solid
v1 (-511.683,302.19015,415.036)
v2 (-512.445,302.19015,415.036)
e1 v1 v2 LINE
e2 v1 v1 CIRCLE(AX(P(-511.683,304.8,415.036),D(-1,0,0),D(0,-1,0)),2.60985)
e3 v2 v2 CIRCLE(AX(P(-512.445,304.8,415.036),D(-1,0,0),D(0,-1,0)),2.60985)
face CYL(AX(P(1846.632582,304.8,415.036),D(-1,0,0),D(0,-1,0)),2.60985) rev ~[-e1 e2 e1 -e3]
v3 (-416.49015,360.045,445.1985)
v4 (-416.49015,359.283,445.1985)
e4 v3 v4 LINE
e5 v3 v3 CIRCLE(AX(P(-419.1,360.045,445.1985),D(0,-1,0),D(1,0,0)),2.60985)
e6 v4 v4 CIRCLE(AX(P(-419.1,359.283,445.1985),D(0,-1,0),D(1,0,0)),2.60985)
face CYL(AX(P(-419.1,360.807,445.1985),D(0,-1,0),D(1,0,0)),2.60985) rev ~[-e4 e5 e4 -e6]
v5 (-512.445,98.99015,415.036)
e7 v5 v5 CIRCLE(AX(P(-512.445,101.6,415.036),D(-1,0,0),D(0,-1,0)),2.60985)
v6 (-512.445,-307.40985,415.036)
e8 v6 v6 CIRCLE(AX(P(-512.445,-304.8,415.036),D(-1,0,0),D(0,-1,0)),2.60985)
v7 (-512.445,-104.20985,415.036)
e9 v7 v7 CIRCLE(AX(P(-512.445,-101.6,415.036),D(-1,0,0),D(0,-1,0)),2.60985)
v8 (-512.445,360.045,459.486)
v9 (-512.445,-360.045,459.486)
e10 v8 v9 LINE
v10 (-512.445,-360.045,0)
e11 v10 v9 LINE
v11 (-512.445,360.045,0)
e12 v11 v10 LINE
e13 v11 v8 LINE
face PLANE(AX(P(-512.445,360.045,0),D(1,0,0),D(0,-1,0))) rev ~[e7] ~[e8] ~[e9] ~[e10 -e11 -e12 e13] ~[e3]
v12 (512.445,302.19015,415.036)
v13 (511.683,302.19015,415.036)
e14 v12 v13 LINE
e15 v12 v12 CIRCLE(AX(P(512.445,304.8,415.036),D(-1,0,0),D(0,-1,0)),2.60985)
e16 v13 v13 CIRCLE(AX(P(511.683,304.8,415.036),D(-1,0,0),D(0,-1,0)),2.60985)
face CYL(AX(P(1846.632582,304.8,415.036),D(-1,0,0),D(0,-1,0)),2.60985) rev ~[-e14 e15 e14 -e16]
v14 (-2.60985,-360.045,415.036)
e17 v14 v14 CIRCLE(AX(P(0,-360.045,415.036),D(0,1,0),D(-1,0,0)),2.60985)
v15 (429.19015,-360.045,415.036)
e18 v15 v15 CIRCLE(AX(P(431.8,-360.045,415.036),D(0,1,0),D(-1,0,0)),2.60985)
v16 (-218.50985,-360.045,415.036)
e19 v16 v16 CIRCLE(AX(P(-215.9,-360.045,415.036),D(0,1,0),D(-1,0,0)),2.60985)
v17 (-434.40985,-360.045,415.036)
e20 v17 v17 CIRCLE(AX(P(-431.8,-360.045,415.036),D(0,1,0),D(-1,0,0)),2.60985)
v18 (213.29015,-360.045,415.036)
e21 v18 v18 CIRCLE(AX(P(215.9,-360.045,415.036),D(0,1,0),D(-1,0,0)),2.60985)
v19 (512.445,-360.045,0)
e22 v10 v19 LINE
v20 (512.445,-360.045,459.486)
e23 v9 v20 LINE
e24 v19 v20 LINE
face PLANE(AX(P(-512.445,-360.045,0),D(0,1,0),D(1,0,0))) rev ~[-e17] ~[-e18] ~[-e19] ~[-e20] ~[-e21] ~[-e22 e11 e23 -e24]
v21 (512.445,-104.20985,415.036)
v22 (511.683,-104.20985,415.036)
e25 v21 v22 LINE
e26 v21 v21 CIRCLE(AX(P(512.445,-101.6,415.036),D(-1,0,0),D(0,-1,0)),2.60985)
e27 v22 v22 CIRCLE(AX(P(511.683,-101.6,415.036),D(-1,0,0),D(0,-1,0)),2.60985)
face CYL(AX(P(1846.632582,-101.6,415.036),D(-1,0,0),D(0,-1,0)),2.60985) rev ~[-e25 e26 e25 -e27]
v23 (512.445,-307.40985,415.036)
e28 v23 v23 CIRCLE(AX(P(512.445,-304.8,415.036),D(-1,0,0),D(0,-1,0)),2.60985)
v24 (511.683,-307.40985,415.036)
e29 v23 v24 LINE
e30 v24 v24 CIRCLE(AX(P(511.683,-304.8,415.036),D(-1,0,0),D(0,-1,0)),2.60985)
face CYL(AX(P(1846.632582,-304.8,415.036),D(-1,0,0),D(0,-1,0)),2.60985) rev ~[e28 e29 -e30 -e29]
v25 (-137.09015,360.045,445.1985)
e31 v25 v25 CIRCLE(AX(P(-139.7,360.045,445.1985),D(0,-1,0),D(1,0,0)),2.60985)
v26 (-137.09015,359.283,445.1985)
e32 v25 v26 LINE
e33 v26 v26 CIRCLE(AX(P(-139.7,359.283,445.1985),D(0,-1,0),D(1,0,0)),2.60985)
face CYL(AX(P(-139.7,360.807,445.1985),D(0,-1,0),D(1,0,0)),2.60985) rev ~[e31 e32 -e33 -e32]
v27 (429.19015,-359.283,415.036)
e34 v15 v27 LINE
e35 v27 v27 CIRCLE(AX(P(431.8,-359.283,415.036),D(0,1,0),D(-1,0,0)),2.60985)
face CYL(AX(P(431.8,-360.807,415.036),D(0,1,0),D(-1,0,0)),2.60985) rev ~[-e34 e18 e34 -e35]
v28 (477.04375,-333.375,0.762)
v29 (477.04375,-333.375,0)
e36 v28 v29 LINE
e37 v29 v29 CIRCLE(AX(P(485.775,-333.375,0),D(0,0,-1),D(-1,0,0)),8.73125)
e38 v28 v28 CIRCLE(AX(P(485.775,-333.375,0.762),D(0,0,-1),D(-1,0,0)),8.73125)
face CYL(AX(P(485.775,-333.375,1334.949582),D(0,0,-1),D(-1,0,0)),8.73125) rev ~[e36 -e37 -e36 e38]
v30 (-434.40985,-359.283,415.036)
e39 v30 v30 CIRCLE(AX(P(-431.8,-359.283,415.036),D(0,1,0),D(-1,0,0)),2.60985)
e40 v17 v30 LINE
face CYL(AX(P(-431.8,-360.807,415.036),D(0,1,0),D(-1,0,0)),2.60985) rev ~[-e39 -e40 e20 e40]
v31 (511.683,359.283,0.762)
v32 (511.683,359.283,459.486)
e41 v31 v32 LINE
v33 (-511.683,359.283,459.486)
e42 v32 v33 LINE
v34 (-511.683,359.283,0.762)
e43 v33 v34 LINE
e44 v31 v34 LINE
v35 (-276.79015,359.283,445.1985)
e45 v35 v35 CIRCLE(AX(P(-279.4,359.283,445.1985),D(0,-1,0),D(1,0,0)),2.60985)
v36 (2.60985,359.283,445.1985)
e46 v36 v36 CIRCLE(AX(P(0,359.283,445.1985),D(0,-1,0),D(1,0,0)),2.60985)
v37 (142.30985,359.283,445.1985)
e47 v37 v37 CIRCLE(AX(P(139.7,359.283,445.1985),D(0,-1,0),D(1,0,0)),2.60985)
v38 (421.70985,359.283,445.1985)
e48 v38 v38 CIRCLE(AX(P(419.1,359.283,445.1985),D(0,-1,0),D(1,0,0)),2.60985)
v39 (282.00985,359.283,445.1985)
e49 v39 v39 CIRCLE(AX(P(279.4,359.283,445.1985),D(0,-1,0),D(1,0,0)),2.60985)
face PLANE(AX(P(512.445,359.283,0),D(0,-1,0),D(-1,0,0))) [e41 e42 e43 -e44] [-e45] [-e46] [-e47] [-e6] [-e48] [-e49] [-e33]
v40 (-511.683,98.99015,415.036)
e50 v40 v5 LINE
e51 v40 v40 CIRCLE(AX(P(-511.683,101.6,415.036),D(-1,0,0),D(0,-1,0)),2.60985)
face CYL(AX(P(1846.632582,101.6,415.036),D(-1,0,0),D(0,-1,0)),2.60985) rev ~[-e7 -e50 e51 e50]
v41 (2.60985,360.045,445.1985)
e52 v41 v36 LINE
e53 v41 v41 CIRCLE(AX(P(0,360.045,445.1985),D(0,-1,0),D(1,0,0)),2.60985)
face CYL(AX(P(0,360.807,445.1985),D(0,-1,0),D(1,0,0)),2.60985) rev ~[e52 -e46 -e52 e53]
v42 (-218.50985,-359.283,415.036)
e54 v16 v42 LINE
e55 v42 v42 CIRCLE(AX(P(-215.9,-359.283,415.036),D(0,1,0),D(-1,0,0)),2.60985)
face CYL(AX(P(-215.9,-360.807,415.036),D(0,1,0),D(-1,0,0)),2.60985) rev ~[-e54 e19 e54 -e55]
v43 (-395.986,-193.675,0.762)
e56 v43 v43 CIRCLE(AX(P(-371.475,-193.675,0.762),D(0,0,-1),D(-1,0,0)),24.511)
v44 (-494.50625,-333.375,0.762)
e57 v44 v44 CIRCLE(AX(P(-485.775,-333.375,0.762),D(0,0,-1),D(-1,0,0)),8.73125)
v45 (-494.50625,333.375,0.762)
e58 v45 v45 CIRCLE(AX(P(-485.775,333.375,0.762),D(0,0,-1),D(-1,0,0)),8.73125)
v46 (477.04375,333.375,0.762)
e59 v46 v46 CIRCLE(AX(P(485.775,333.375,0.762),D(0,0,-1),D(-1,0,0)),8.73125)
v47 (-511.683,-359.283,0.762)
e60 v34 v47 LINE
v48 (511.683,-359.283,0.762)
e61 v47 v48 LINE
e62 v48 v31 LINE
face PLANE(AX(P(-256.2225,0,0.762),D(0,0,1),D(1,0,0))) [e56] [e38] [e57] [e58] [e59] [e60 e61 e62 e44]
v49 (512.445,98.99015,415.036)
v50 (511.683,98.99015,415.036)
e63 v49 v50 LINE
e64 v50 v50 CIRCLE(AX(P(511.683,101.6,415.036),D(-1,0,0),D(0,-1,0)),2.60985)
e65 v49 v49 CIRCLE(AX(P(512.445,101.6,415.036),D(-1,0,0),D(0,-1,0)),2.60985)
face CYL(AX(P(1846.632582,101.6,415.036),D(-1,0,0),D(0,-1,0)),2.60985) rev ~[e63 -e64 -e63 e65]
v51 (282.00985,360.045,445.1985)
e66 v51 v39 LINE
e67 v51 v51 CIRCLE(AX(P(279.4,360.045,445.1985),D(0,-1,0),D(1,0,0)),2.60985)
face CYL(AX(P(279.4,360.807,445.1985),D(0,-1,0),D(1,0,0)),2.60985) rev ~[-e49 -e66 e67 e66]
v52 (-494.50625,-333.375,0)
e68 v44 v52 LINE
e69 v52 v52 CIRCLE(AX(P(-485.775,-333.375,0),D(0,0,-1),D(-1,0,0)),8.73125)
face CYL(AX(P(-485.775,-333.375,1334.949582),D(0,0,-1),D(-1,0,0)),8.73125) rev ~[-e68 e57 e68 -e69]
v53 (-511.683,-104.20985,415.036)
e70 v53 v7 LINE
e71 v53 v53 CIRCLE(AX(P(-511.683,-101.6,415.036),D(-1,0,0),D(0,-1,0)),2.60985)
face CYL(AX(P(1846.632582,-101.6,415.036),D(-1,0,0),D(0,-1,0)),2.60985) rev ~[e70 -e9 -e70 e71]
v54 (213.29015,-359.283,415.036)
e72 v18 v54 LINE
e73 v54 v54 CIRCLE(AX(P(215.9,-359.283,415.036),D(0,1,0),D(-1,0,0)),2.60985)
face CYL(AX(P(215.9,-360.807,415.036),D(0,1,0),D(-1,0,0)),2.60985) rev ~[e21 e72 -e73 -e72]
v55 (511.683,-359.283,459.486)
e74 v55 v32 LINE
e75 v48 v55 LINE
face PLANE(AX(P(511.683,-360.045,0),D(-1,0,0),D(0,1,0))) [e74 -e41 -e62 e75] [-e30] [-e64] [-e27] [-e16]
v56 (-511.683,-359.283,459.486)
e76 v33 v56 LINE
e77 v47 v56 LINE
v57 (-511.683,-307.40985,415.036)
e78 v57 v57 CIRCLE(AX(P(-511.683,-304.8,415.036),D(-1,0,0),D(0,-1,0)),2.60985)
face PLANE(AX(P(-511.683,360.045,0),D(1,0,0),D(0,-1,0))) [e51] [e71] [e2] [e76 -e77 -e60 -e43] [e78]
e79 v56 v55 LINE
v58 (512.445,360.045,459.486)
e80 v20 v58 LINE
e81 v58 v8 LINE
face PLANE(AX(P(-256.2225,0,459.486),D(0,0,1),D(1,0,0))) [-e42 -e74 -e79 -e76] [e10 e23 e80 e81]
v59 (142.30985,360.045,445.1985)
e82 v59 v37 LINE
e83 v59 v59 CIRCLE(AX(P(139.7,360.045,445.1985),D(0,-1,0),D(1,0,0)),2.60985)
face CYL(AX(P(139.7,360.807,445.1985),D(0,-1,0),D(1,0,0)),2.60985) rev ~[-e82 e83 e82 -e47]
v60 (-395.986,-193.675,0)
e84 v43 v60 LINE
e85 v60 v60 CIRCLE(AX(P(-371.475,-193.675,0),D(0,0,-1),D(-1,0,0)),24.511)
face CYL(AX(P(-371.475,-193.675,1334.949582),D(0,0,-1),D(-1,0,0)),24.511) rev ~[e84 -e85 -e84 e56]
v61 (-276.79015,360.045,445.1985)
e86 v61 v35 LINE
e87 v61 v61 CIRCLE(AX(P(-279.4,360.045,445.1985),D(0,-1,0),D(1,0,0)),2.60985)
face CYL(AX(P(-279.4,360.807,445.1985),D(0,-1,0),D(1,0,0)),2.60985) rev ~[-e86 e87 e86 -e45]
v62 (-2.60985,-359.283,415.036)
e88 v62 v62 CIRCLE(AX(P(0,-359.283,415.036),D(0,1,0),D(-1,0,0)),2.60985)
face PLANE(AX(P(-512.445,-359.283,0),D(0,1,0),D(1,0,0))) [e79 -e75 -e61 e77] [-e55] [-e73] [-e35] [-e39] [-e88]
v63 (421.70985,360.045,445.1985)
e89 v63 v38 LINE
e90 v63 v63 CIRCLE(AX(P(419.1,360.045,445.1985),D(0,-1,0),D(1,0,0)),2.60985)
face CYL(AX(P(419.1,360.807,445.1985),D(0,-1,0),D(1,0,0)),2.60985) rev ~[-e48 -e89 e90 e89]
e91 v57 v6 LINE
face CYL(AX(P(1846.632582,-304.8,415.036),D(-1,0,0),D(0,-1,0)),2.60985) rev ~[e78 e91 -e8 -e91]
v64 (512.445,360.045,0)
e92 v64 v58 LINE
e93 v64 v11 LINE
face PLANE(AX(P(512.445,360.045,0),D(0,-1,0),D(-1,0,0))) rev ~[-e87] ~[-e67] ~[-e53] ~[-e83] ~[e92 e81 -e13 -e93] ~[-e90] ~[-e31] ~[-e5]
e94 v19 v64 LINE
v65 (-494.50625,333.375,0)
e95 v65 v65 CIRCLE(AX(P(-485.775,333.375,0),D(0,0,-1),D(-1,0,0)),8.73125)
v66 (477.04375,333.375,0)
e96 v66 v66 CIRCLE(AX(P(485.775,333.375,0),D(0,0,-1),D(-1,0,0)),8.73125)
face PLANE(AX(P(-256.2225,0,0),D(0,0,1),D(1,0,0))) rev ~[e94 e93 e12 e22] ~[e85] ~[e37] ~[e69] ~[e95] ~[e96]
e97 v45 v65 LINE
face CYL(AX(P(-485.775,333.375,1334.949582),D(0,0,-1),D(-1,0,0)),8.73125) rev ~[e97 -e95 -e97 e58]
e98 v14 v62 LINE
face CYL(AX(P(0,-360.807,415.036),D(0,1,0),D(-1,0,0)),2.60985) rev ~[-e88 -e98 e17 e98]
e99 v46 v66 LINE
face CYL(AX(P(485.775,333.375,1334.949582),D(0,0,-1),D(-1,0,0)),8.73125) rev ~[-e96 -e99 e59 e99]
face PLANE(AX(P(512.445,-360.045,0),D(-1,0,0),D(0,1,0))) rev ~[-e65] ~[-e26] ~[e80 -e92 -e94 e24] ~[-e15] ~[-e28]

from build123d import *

# Parameters (mm, degrees)
F1_DEPTH  = 459.486
F2_T      = -0.762
F5_D      = 5.2197
F5_DEPTH  = 0.762
F5_TIP    = 1.5681560866
F6_D      = 5.2197
F8_D      = 49.022
F10_D     = 17.4625
F13_D     = 5.2197
F13_DEPTH = 0.762
F13_TIP   = 1.5681560866


# Not quite as in the source:
# - a length typed as a fraction of an inch, garbled in the dataset ("3 / 203.2 mm" for 3/8 in), is restored


with BuildPart() as f1:
    # F0 (on Top) → F1 (new body)
    with BuildSketch(Plane.XY):
        Polygon((0, 360.045), (-512.445, 360.045), (-512.445, -360.045), (0, -360.045), (0, 0), align=None)
        Polygon((512.445, 360.045), (0, 360.045), (0, 0), (0, -360.045), (512.445, -360.045), align=None)
    extrude(amount=F1_DEPTH)

    # F2
    f2_openings = [f1.faces().sort_by_distance(p)[0] for p in [
        (0, 0, 459.486),
    ]]
    offset(amount=F2_T, openings=f2_openings)

    # F5
    with Locations(Plane.XZ.offset(360.045)):
        with Locations((-431.8, 415.036), (-215.9, 415.036), (0, 415.036), (215.9, 415.036), (431.8, 415.036)):
            Hole(F5_D / 2, depth=F5_DEPTH)
            with Locations((0, 0, -(F5_DEPTH + F5_TIP / 2))):  # 118° drill point
                Cone(0, F5_D / 2, F5_TIP, mode=Mode.SUBTRACT)

    # F6 (through all)
    with Locations(Plane.YZ.offset(512.445)):
        with Locations((-304.8, 415.036), (-101.6, 415.036), (101.6, 415.036), (304.8, 415.036)):
            Hole(F6_D / 2)

    # F8 (through all)
    with Locations(Plane.XY.offset(0.762)):
        with Locations((-371.475, -193.675)):
            Hole(F8_D / 2)

    # F10 (through all)
    with Locations(Plane.XY.offset(0.762)):
        with Locations((-485.775, 333.375), (-485.775, -333.375), (485.775, -333.375), (485.775, 333.375)):
            Hole(F10_D / 2)

    # F13
    with Locations(Plane(origin=(0, 360.045, 0), x_dir=(-1, 0, 0), z_dir=(0, 1, 0))):
        with Locations((-419.1, 445.1985), (-279.4, 445.1985), (-139.7, 445.1985), (0, 445.1985), (139.7, 445.1985), (279.4, 445.1985), (419.1, 445.1985)):
            Hole(F13_D / 2, depth=F13_DEPTH)
            with Locations((0, 0, -(F13_DEPTH + F13_TIP / 2))):  # 118° drill point
                Cone(0, F13_D / 2, F13_TIP, mode=Mode.SUBTRACT)


solid = f1.part
